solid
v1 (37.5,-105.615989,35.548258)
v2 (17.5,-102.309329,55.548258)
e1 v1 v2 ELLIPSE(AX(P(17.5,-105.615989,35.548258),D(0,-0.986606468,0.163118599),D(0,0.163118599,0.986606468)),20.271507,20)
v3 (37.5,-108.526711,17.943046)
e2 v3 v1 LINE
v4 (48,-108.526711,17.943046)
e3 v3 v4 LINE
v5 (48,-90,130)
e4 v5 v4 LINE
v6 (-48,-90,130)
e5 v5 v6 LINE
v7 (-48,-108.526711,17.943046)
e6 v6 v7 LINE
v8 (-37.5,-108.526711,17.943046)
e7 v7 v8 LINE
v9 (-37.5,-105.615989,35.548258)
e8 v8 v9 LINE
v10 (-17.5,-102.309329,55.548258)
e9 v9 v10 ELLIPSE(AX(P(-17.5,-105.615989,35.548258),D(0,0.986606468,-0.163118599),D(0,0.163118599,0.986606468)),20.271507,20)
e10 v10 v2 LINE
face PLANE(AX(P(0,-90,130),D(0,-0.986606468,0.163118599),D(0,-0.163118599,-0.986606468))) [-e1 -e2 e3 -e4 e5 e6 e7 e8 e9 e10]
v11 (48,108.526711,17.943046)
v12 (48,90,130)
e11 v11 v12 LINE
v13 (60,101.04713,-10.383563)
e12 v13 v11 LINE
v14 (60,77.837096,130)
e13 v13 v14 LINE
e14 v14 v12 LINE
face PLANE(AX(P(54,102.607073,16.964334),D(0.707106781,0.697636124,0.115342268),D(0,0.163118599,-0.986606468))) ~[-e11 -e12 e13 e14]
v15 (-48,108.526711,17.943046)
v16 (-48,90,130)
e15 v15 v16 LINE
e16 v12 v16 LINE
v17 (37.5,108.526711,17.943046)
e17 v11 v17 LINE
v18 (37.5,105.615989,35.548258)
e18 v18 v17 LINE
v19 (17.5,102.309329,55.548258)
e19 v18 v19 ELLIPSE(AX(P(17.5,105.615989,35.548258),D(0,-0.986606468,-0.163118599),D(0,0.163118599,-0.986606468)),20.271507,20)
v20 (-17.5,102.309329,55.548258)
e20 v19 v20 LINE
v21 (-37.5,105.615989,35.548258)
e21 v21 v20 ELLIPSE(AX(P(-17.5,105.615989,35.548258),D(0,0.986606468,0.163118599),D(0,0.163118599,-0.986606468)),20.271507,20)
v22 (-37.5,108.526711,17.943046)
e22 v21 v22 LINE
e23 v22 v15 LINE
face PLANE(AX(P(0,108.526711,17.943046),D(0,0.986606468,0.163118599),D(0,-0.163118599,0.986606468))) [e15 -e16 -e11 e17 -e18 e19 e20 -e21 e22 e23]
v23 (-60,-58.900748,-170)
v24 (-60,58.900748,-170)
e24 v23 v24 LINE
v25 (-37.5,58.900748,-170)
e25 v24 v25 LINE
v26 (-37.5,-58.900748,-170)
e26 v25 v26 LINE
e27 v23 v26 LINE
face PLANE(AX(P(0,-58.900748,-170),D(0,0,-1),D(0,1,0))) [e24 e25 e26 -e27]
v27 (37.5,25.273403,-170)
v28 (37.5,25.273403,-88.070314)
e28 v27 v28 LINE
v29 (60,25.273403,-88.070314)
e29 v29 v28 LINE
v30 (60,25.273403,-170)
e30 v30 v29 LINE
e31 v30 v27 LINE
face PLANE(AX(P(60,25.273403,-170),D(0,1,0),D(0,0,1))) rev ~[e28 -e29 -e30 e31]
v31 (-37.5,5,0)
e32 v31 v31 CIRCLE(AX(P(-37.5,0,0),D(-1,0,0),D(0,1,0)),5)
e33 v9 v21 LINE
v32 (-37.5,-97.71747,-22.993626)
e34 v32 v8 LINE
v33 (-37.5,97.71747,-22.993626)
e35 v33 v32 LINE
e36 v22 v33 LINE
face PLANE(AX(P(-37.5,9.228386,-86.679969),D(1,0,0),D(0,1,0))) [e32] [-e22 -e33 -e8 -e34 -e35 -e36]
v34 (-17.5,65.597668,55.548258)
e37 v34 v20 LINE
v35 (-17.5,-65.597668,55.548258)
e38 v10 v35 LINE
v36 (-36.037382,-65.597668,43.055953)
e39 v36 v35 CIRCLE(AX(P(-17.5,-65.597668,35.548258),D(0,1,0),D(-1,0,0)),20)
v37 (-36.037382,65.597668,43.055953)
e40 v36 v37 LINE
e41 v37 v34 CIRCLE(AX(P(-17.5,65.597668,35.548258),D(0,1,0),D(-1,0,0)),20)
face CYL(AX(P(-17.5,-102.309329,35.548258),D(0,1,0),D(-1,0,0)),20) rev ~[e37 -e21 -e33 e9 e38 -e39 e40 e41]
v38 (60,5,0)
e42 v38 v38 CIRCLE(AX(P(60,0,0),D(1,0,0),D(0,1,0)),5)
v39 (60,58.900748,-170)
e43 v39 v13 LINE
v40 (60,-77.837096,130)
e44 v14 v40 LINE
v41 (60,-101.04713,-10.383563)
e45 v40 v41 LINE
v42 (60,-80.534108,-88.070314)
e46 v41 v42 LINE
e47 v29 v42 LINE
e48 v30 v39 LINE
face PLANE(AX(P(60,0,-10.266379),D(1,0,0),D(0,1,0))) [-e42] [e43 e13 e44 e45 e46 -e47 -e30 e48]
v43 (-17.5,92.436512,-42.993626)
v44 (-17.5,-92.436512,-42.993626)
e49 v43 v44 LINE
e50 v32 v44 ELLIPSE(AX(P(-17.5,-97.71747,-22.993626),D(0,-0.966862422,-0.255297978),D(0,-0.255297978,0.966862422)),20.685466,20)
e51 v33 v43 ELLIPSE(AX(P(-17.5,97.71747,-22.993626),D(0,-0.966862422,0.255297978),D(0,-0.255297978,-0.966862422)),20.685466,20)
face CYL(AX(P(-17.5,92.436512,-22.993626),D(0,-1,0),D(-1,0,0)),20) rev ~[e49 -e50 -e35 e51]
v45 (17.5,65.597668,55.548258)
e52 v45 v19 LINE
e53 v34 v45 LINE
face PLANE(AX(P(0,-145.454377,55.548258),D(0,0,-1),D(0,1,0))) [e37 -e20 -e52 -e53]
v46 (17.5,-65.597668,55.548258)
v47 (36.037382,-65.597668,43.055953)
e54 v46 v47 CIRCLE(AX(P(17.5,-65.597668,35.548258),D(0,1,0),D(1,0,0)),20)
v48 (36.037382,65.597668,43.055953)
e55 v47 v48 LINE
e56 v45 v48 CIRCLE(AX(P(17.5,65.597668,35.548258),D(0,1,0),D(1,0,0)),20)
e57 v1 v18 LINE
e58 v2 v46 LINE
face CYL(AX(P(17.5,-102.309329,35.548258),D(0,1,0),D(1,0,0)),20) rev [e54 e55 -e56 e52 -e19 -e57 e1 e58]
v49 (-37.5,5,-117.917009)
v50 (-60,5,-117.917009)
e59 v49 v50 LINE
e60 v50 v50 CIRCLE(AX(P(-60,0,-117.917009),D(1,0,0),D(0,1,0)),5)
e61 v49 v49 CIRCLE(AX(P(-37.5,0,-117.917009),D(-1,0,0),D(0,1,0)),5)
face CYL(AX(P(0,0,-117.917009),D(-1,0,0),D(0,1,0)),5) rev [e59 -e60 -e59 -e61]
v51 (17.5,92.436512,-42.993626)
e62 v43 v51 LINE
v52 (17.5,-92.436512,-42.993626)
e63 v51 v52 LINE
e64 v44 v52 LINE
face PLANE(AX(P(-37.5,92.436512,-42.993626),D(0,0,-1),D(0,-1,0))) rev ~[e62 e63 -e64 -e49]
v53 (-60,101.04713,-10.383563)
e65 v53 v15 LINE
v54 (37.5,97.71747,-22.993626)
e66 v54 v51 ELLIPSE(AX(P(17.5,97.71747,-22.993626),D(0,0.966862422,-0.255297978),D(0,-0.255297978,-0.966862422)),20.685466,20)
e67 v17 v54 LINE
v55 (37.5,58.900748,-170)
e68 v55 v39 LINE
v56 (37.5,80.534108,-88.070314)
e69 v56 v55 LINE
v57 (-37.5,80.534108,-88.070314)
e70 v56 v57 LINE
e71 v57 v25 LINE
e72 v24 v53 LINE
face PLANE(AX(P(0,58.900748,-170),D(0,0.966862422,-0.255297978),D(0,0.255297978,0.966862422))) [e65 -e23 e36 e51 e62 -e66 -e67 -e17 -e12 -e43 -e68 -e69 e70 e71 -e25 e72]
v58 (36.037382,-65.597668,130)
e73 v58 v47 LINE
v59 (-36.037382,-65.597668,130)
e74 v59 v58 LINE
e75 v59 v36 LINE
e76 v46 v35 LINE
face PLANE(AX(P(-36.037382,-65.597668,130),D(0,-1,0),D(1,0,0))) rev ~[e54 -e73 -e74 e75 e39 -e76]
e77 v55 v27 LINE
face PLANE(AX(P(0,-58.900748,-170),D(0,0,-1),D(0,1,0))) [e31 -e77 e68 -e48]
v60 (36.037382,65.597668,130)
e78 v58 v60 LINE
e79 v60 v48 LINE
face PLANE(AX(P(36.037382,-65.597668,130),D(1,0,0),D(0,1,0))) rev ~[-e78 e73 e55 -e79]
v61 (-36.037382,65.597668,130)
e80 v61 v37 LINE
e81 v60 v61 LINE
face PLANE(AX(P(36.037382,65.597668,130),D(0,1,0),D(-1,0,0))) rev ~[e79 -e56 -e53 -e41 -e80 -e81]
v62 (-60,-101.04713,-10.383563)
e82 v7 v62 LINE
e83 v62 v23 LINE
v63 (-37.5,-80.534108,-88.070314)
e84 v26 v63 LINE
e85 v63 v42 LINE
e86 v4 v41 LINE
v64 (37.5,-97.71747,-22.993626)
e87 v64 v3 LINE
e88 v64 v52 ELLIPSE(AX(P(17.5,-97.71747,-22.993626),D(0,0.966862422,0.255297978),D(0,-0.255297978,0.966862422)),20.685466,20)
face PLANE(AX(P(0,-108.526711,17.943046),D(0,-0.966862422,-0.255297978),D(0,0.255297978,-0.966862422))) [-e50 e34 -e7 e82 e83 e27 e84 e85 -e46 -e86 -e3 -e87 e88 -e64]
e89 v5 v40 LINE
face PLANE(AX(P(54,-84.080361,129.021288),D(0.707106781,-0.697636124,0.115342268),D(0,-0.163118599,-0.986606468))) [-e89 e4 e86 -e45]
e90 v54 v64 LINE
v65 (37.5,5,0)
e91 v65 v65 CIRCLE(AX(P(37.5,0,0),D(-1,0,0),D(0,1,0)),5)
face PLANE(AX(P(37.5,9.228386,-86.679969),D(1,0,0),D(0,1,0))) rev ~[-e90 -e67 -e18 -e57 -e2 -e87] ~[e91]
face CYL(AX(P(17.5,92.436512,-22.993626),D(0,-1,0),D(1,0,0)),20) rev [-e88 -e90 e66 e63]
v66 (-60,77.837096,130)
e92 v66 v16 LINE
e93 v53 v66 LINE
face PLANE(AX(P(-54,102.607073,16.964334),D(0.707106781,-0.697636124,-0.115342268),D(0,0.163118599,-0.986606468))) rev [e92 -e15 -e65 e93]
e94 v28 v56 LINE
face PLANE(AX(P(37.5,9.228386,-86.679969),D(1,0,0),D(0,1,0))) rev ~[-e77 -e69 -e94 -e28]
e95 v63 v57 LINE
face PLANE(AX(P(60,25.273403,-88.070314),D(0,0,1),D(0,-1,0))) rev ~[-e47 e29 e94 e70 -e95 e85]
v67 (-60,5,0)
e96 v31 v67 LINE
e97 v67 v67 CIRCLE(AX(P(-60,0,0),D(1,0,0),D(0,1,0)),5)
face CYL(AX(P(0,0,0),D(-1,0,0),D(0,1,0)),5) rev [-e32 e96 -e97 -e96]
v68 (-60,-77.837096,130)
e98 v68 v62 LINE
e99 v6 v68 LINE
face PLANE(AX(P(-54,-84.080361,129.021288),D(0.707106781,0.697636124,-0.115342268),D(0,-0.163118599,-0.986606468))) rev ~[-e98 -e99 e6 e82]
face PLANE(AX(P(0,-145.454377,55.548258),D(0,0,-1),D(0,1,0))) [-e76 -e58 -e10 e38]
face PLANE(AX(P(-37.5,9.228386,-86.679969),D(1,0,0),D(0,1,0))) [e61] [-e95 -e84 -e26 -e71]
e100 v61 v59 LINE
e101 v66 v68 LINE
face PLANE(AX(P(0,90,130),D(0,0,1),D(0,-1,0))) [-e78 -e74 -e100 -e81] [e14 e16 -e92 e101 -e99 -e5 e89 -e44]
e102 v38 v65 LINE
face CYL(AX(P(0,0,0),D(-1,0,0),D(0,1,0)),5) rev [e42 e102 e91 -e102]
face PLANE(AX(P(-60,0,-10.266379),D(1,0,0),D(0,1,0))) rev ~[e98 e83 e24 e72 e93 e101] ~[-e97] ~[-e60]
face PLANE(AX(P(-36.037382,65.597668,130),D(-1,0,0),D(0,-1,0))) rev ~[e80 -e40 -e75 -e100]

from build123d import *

# Parameters (mm, degrees)
F0_R      = 5
F1_DEPTH  = 60
F3_W      = 309.3655258417
F3_H      = 284.4564542174
F4_DEPTH  = 37.5
F5_SIZE   = 12
F7_DEPTH  = 75
F9_R      = 20
F11_DEPTH = 86.9450472691
F8_R      = 5
F7_FACE_R = 5
F12_DEPTH = 22.5


# Not quite as in the source:
# - a feature names something its author has since deleted; it is built from what else it names


with BuildPart() as f1:
    # F0 (on Right) → F1 (new body, symmetric)
    with BuildSketch(Plane.YZ):
        Polygon((75, 130), (-75, 130), (-90, 130), (-108.526711476, 17.9430459013), (-58.9007476441, -170), (58.9007476441, -170), (108.526711476, 17.9430459013), (90, 130), align=None)
        with Locations((0, -117.917008698)):
            Circle(F0_R, mode=Mode.SUBTRACT)
        Circle(F0_R, mode=Mode.SUBTRACT)
    extrude(amount=F1_DEPTH, both=True)

    # F3 (on face) → F4 (cut, symmetric)
    with BuildSketch(Plane.YZ):
        with Locations((9.2283859849, -86.6799689829)):
            Rectangle(F3_W, F3_H)
    extrude(amount=F4_DEPTH, both=True, mode=Mode.SUBTRACT)

    # F5
    f5_edges = [f1.edges().sort_by_distance(p)[0] for p in [
        (-60, -99.263356, 73.971523),
        (-60, 99.263356, 73.971523),
        (60, -99.263356, 73.971523),
        (60, 99.263356, 73.971523),
    ]]
    chamfer(f5_edges, length=F5_SIZE)

    # F6 (on face) → F7 (join, through all)
    with BuildSketch(Plane.YZ.offset(-37.5)):
        Polygon((92.4365120253, -42.9936263649), (-92.4365120253, -42.9936263649), (-80.5341079321, -88.0703141729), (80.5341079321, -88.0703141729), align=None)
    extrude(amount=F7_DEPTH)

    # F9
    f9_edges = [f1.edges().sort_by_distance(p)[0] for p in [
        (-37.5, 0, 55.548258),
        (37.5, 0, 55.548258),
        (-37.5, 0, -42.993626),
        (37.5, 0, -42.993626),
    ]]
    fillet(f9_edges, radius=F9_R)

    # F10 (on face) → F11 (cut, through all)
    with BuildSketch(Plane.XY.offset(130)):
        Polygon((36.0373817384, 65.5976682901), (0, 65.5976682901), (-36.0373817384, 65.5976682901), (-36.0373817384, 0), (-36.0373817384, -65.5976682901), (0, -65.5976682901), (36.0373817384, -65.5976682901), (36.0373817384, 0), align=None)
    extrude(amount=-F11_DEPTH, mode=Mode.SUBTRACT)

    # F8 (on face) + F7_face (on face) → F12 (cut, through all)
    with BuildSketch(Plane.YZ.offset(60)):
        Polygon((25.2734031528, -88.0703141729), (-80.5341079321, -88.0703141729), (-58.9007476441, -170), (25.2734031528, -170), align=None)
        with Locations((0, -117.917008698)):
            Circle(F8_R, mode=Mode.SUBTRACT)
    with BuildSketch(Plane(origin=(37.5, 0, -126.978888881), x_dir=(0, -1, 0), z_dir=(-1, 0, 0))):
        Polygon((-80.5341079321, 38.9085747081), (-58.9007476441, -43.021111119), (58.9007476441, -43.021111119), (80.5341079321, 38.9085747081), align=None)
        with Locations((0, 9.061880183)):
            Circle(F7_FACE_R, mode=Mode.SUBTRACT)
    extrude(amount=-F12_DEPTH, dir=(1, 0, 0), mode=Mode.SUBTRACT)


solid = f1.part
